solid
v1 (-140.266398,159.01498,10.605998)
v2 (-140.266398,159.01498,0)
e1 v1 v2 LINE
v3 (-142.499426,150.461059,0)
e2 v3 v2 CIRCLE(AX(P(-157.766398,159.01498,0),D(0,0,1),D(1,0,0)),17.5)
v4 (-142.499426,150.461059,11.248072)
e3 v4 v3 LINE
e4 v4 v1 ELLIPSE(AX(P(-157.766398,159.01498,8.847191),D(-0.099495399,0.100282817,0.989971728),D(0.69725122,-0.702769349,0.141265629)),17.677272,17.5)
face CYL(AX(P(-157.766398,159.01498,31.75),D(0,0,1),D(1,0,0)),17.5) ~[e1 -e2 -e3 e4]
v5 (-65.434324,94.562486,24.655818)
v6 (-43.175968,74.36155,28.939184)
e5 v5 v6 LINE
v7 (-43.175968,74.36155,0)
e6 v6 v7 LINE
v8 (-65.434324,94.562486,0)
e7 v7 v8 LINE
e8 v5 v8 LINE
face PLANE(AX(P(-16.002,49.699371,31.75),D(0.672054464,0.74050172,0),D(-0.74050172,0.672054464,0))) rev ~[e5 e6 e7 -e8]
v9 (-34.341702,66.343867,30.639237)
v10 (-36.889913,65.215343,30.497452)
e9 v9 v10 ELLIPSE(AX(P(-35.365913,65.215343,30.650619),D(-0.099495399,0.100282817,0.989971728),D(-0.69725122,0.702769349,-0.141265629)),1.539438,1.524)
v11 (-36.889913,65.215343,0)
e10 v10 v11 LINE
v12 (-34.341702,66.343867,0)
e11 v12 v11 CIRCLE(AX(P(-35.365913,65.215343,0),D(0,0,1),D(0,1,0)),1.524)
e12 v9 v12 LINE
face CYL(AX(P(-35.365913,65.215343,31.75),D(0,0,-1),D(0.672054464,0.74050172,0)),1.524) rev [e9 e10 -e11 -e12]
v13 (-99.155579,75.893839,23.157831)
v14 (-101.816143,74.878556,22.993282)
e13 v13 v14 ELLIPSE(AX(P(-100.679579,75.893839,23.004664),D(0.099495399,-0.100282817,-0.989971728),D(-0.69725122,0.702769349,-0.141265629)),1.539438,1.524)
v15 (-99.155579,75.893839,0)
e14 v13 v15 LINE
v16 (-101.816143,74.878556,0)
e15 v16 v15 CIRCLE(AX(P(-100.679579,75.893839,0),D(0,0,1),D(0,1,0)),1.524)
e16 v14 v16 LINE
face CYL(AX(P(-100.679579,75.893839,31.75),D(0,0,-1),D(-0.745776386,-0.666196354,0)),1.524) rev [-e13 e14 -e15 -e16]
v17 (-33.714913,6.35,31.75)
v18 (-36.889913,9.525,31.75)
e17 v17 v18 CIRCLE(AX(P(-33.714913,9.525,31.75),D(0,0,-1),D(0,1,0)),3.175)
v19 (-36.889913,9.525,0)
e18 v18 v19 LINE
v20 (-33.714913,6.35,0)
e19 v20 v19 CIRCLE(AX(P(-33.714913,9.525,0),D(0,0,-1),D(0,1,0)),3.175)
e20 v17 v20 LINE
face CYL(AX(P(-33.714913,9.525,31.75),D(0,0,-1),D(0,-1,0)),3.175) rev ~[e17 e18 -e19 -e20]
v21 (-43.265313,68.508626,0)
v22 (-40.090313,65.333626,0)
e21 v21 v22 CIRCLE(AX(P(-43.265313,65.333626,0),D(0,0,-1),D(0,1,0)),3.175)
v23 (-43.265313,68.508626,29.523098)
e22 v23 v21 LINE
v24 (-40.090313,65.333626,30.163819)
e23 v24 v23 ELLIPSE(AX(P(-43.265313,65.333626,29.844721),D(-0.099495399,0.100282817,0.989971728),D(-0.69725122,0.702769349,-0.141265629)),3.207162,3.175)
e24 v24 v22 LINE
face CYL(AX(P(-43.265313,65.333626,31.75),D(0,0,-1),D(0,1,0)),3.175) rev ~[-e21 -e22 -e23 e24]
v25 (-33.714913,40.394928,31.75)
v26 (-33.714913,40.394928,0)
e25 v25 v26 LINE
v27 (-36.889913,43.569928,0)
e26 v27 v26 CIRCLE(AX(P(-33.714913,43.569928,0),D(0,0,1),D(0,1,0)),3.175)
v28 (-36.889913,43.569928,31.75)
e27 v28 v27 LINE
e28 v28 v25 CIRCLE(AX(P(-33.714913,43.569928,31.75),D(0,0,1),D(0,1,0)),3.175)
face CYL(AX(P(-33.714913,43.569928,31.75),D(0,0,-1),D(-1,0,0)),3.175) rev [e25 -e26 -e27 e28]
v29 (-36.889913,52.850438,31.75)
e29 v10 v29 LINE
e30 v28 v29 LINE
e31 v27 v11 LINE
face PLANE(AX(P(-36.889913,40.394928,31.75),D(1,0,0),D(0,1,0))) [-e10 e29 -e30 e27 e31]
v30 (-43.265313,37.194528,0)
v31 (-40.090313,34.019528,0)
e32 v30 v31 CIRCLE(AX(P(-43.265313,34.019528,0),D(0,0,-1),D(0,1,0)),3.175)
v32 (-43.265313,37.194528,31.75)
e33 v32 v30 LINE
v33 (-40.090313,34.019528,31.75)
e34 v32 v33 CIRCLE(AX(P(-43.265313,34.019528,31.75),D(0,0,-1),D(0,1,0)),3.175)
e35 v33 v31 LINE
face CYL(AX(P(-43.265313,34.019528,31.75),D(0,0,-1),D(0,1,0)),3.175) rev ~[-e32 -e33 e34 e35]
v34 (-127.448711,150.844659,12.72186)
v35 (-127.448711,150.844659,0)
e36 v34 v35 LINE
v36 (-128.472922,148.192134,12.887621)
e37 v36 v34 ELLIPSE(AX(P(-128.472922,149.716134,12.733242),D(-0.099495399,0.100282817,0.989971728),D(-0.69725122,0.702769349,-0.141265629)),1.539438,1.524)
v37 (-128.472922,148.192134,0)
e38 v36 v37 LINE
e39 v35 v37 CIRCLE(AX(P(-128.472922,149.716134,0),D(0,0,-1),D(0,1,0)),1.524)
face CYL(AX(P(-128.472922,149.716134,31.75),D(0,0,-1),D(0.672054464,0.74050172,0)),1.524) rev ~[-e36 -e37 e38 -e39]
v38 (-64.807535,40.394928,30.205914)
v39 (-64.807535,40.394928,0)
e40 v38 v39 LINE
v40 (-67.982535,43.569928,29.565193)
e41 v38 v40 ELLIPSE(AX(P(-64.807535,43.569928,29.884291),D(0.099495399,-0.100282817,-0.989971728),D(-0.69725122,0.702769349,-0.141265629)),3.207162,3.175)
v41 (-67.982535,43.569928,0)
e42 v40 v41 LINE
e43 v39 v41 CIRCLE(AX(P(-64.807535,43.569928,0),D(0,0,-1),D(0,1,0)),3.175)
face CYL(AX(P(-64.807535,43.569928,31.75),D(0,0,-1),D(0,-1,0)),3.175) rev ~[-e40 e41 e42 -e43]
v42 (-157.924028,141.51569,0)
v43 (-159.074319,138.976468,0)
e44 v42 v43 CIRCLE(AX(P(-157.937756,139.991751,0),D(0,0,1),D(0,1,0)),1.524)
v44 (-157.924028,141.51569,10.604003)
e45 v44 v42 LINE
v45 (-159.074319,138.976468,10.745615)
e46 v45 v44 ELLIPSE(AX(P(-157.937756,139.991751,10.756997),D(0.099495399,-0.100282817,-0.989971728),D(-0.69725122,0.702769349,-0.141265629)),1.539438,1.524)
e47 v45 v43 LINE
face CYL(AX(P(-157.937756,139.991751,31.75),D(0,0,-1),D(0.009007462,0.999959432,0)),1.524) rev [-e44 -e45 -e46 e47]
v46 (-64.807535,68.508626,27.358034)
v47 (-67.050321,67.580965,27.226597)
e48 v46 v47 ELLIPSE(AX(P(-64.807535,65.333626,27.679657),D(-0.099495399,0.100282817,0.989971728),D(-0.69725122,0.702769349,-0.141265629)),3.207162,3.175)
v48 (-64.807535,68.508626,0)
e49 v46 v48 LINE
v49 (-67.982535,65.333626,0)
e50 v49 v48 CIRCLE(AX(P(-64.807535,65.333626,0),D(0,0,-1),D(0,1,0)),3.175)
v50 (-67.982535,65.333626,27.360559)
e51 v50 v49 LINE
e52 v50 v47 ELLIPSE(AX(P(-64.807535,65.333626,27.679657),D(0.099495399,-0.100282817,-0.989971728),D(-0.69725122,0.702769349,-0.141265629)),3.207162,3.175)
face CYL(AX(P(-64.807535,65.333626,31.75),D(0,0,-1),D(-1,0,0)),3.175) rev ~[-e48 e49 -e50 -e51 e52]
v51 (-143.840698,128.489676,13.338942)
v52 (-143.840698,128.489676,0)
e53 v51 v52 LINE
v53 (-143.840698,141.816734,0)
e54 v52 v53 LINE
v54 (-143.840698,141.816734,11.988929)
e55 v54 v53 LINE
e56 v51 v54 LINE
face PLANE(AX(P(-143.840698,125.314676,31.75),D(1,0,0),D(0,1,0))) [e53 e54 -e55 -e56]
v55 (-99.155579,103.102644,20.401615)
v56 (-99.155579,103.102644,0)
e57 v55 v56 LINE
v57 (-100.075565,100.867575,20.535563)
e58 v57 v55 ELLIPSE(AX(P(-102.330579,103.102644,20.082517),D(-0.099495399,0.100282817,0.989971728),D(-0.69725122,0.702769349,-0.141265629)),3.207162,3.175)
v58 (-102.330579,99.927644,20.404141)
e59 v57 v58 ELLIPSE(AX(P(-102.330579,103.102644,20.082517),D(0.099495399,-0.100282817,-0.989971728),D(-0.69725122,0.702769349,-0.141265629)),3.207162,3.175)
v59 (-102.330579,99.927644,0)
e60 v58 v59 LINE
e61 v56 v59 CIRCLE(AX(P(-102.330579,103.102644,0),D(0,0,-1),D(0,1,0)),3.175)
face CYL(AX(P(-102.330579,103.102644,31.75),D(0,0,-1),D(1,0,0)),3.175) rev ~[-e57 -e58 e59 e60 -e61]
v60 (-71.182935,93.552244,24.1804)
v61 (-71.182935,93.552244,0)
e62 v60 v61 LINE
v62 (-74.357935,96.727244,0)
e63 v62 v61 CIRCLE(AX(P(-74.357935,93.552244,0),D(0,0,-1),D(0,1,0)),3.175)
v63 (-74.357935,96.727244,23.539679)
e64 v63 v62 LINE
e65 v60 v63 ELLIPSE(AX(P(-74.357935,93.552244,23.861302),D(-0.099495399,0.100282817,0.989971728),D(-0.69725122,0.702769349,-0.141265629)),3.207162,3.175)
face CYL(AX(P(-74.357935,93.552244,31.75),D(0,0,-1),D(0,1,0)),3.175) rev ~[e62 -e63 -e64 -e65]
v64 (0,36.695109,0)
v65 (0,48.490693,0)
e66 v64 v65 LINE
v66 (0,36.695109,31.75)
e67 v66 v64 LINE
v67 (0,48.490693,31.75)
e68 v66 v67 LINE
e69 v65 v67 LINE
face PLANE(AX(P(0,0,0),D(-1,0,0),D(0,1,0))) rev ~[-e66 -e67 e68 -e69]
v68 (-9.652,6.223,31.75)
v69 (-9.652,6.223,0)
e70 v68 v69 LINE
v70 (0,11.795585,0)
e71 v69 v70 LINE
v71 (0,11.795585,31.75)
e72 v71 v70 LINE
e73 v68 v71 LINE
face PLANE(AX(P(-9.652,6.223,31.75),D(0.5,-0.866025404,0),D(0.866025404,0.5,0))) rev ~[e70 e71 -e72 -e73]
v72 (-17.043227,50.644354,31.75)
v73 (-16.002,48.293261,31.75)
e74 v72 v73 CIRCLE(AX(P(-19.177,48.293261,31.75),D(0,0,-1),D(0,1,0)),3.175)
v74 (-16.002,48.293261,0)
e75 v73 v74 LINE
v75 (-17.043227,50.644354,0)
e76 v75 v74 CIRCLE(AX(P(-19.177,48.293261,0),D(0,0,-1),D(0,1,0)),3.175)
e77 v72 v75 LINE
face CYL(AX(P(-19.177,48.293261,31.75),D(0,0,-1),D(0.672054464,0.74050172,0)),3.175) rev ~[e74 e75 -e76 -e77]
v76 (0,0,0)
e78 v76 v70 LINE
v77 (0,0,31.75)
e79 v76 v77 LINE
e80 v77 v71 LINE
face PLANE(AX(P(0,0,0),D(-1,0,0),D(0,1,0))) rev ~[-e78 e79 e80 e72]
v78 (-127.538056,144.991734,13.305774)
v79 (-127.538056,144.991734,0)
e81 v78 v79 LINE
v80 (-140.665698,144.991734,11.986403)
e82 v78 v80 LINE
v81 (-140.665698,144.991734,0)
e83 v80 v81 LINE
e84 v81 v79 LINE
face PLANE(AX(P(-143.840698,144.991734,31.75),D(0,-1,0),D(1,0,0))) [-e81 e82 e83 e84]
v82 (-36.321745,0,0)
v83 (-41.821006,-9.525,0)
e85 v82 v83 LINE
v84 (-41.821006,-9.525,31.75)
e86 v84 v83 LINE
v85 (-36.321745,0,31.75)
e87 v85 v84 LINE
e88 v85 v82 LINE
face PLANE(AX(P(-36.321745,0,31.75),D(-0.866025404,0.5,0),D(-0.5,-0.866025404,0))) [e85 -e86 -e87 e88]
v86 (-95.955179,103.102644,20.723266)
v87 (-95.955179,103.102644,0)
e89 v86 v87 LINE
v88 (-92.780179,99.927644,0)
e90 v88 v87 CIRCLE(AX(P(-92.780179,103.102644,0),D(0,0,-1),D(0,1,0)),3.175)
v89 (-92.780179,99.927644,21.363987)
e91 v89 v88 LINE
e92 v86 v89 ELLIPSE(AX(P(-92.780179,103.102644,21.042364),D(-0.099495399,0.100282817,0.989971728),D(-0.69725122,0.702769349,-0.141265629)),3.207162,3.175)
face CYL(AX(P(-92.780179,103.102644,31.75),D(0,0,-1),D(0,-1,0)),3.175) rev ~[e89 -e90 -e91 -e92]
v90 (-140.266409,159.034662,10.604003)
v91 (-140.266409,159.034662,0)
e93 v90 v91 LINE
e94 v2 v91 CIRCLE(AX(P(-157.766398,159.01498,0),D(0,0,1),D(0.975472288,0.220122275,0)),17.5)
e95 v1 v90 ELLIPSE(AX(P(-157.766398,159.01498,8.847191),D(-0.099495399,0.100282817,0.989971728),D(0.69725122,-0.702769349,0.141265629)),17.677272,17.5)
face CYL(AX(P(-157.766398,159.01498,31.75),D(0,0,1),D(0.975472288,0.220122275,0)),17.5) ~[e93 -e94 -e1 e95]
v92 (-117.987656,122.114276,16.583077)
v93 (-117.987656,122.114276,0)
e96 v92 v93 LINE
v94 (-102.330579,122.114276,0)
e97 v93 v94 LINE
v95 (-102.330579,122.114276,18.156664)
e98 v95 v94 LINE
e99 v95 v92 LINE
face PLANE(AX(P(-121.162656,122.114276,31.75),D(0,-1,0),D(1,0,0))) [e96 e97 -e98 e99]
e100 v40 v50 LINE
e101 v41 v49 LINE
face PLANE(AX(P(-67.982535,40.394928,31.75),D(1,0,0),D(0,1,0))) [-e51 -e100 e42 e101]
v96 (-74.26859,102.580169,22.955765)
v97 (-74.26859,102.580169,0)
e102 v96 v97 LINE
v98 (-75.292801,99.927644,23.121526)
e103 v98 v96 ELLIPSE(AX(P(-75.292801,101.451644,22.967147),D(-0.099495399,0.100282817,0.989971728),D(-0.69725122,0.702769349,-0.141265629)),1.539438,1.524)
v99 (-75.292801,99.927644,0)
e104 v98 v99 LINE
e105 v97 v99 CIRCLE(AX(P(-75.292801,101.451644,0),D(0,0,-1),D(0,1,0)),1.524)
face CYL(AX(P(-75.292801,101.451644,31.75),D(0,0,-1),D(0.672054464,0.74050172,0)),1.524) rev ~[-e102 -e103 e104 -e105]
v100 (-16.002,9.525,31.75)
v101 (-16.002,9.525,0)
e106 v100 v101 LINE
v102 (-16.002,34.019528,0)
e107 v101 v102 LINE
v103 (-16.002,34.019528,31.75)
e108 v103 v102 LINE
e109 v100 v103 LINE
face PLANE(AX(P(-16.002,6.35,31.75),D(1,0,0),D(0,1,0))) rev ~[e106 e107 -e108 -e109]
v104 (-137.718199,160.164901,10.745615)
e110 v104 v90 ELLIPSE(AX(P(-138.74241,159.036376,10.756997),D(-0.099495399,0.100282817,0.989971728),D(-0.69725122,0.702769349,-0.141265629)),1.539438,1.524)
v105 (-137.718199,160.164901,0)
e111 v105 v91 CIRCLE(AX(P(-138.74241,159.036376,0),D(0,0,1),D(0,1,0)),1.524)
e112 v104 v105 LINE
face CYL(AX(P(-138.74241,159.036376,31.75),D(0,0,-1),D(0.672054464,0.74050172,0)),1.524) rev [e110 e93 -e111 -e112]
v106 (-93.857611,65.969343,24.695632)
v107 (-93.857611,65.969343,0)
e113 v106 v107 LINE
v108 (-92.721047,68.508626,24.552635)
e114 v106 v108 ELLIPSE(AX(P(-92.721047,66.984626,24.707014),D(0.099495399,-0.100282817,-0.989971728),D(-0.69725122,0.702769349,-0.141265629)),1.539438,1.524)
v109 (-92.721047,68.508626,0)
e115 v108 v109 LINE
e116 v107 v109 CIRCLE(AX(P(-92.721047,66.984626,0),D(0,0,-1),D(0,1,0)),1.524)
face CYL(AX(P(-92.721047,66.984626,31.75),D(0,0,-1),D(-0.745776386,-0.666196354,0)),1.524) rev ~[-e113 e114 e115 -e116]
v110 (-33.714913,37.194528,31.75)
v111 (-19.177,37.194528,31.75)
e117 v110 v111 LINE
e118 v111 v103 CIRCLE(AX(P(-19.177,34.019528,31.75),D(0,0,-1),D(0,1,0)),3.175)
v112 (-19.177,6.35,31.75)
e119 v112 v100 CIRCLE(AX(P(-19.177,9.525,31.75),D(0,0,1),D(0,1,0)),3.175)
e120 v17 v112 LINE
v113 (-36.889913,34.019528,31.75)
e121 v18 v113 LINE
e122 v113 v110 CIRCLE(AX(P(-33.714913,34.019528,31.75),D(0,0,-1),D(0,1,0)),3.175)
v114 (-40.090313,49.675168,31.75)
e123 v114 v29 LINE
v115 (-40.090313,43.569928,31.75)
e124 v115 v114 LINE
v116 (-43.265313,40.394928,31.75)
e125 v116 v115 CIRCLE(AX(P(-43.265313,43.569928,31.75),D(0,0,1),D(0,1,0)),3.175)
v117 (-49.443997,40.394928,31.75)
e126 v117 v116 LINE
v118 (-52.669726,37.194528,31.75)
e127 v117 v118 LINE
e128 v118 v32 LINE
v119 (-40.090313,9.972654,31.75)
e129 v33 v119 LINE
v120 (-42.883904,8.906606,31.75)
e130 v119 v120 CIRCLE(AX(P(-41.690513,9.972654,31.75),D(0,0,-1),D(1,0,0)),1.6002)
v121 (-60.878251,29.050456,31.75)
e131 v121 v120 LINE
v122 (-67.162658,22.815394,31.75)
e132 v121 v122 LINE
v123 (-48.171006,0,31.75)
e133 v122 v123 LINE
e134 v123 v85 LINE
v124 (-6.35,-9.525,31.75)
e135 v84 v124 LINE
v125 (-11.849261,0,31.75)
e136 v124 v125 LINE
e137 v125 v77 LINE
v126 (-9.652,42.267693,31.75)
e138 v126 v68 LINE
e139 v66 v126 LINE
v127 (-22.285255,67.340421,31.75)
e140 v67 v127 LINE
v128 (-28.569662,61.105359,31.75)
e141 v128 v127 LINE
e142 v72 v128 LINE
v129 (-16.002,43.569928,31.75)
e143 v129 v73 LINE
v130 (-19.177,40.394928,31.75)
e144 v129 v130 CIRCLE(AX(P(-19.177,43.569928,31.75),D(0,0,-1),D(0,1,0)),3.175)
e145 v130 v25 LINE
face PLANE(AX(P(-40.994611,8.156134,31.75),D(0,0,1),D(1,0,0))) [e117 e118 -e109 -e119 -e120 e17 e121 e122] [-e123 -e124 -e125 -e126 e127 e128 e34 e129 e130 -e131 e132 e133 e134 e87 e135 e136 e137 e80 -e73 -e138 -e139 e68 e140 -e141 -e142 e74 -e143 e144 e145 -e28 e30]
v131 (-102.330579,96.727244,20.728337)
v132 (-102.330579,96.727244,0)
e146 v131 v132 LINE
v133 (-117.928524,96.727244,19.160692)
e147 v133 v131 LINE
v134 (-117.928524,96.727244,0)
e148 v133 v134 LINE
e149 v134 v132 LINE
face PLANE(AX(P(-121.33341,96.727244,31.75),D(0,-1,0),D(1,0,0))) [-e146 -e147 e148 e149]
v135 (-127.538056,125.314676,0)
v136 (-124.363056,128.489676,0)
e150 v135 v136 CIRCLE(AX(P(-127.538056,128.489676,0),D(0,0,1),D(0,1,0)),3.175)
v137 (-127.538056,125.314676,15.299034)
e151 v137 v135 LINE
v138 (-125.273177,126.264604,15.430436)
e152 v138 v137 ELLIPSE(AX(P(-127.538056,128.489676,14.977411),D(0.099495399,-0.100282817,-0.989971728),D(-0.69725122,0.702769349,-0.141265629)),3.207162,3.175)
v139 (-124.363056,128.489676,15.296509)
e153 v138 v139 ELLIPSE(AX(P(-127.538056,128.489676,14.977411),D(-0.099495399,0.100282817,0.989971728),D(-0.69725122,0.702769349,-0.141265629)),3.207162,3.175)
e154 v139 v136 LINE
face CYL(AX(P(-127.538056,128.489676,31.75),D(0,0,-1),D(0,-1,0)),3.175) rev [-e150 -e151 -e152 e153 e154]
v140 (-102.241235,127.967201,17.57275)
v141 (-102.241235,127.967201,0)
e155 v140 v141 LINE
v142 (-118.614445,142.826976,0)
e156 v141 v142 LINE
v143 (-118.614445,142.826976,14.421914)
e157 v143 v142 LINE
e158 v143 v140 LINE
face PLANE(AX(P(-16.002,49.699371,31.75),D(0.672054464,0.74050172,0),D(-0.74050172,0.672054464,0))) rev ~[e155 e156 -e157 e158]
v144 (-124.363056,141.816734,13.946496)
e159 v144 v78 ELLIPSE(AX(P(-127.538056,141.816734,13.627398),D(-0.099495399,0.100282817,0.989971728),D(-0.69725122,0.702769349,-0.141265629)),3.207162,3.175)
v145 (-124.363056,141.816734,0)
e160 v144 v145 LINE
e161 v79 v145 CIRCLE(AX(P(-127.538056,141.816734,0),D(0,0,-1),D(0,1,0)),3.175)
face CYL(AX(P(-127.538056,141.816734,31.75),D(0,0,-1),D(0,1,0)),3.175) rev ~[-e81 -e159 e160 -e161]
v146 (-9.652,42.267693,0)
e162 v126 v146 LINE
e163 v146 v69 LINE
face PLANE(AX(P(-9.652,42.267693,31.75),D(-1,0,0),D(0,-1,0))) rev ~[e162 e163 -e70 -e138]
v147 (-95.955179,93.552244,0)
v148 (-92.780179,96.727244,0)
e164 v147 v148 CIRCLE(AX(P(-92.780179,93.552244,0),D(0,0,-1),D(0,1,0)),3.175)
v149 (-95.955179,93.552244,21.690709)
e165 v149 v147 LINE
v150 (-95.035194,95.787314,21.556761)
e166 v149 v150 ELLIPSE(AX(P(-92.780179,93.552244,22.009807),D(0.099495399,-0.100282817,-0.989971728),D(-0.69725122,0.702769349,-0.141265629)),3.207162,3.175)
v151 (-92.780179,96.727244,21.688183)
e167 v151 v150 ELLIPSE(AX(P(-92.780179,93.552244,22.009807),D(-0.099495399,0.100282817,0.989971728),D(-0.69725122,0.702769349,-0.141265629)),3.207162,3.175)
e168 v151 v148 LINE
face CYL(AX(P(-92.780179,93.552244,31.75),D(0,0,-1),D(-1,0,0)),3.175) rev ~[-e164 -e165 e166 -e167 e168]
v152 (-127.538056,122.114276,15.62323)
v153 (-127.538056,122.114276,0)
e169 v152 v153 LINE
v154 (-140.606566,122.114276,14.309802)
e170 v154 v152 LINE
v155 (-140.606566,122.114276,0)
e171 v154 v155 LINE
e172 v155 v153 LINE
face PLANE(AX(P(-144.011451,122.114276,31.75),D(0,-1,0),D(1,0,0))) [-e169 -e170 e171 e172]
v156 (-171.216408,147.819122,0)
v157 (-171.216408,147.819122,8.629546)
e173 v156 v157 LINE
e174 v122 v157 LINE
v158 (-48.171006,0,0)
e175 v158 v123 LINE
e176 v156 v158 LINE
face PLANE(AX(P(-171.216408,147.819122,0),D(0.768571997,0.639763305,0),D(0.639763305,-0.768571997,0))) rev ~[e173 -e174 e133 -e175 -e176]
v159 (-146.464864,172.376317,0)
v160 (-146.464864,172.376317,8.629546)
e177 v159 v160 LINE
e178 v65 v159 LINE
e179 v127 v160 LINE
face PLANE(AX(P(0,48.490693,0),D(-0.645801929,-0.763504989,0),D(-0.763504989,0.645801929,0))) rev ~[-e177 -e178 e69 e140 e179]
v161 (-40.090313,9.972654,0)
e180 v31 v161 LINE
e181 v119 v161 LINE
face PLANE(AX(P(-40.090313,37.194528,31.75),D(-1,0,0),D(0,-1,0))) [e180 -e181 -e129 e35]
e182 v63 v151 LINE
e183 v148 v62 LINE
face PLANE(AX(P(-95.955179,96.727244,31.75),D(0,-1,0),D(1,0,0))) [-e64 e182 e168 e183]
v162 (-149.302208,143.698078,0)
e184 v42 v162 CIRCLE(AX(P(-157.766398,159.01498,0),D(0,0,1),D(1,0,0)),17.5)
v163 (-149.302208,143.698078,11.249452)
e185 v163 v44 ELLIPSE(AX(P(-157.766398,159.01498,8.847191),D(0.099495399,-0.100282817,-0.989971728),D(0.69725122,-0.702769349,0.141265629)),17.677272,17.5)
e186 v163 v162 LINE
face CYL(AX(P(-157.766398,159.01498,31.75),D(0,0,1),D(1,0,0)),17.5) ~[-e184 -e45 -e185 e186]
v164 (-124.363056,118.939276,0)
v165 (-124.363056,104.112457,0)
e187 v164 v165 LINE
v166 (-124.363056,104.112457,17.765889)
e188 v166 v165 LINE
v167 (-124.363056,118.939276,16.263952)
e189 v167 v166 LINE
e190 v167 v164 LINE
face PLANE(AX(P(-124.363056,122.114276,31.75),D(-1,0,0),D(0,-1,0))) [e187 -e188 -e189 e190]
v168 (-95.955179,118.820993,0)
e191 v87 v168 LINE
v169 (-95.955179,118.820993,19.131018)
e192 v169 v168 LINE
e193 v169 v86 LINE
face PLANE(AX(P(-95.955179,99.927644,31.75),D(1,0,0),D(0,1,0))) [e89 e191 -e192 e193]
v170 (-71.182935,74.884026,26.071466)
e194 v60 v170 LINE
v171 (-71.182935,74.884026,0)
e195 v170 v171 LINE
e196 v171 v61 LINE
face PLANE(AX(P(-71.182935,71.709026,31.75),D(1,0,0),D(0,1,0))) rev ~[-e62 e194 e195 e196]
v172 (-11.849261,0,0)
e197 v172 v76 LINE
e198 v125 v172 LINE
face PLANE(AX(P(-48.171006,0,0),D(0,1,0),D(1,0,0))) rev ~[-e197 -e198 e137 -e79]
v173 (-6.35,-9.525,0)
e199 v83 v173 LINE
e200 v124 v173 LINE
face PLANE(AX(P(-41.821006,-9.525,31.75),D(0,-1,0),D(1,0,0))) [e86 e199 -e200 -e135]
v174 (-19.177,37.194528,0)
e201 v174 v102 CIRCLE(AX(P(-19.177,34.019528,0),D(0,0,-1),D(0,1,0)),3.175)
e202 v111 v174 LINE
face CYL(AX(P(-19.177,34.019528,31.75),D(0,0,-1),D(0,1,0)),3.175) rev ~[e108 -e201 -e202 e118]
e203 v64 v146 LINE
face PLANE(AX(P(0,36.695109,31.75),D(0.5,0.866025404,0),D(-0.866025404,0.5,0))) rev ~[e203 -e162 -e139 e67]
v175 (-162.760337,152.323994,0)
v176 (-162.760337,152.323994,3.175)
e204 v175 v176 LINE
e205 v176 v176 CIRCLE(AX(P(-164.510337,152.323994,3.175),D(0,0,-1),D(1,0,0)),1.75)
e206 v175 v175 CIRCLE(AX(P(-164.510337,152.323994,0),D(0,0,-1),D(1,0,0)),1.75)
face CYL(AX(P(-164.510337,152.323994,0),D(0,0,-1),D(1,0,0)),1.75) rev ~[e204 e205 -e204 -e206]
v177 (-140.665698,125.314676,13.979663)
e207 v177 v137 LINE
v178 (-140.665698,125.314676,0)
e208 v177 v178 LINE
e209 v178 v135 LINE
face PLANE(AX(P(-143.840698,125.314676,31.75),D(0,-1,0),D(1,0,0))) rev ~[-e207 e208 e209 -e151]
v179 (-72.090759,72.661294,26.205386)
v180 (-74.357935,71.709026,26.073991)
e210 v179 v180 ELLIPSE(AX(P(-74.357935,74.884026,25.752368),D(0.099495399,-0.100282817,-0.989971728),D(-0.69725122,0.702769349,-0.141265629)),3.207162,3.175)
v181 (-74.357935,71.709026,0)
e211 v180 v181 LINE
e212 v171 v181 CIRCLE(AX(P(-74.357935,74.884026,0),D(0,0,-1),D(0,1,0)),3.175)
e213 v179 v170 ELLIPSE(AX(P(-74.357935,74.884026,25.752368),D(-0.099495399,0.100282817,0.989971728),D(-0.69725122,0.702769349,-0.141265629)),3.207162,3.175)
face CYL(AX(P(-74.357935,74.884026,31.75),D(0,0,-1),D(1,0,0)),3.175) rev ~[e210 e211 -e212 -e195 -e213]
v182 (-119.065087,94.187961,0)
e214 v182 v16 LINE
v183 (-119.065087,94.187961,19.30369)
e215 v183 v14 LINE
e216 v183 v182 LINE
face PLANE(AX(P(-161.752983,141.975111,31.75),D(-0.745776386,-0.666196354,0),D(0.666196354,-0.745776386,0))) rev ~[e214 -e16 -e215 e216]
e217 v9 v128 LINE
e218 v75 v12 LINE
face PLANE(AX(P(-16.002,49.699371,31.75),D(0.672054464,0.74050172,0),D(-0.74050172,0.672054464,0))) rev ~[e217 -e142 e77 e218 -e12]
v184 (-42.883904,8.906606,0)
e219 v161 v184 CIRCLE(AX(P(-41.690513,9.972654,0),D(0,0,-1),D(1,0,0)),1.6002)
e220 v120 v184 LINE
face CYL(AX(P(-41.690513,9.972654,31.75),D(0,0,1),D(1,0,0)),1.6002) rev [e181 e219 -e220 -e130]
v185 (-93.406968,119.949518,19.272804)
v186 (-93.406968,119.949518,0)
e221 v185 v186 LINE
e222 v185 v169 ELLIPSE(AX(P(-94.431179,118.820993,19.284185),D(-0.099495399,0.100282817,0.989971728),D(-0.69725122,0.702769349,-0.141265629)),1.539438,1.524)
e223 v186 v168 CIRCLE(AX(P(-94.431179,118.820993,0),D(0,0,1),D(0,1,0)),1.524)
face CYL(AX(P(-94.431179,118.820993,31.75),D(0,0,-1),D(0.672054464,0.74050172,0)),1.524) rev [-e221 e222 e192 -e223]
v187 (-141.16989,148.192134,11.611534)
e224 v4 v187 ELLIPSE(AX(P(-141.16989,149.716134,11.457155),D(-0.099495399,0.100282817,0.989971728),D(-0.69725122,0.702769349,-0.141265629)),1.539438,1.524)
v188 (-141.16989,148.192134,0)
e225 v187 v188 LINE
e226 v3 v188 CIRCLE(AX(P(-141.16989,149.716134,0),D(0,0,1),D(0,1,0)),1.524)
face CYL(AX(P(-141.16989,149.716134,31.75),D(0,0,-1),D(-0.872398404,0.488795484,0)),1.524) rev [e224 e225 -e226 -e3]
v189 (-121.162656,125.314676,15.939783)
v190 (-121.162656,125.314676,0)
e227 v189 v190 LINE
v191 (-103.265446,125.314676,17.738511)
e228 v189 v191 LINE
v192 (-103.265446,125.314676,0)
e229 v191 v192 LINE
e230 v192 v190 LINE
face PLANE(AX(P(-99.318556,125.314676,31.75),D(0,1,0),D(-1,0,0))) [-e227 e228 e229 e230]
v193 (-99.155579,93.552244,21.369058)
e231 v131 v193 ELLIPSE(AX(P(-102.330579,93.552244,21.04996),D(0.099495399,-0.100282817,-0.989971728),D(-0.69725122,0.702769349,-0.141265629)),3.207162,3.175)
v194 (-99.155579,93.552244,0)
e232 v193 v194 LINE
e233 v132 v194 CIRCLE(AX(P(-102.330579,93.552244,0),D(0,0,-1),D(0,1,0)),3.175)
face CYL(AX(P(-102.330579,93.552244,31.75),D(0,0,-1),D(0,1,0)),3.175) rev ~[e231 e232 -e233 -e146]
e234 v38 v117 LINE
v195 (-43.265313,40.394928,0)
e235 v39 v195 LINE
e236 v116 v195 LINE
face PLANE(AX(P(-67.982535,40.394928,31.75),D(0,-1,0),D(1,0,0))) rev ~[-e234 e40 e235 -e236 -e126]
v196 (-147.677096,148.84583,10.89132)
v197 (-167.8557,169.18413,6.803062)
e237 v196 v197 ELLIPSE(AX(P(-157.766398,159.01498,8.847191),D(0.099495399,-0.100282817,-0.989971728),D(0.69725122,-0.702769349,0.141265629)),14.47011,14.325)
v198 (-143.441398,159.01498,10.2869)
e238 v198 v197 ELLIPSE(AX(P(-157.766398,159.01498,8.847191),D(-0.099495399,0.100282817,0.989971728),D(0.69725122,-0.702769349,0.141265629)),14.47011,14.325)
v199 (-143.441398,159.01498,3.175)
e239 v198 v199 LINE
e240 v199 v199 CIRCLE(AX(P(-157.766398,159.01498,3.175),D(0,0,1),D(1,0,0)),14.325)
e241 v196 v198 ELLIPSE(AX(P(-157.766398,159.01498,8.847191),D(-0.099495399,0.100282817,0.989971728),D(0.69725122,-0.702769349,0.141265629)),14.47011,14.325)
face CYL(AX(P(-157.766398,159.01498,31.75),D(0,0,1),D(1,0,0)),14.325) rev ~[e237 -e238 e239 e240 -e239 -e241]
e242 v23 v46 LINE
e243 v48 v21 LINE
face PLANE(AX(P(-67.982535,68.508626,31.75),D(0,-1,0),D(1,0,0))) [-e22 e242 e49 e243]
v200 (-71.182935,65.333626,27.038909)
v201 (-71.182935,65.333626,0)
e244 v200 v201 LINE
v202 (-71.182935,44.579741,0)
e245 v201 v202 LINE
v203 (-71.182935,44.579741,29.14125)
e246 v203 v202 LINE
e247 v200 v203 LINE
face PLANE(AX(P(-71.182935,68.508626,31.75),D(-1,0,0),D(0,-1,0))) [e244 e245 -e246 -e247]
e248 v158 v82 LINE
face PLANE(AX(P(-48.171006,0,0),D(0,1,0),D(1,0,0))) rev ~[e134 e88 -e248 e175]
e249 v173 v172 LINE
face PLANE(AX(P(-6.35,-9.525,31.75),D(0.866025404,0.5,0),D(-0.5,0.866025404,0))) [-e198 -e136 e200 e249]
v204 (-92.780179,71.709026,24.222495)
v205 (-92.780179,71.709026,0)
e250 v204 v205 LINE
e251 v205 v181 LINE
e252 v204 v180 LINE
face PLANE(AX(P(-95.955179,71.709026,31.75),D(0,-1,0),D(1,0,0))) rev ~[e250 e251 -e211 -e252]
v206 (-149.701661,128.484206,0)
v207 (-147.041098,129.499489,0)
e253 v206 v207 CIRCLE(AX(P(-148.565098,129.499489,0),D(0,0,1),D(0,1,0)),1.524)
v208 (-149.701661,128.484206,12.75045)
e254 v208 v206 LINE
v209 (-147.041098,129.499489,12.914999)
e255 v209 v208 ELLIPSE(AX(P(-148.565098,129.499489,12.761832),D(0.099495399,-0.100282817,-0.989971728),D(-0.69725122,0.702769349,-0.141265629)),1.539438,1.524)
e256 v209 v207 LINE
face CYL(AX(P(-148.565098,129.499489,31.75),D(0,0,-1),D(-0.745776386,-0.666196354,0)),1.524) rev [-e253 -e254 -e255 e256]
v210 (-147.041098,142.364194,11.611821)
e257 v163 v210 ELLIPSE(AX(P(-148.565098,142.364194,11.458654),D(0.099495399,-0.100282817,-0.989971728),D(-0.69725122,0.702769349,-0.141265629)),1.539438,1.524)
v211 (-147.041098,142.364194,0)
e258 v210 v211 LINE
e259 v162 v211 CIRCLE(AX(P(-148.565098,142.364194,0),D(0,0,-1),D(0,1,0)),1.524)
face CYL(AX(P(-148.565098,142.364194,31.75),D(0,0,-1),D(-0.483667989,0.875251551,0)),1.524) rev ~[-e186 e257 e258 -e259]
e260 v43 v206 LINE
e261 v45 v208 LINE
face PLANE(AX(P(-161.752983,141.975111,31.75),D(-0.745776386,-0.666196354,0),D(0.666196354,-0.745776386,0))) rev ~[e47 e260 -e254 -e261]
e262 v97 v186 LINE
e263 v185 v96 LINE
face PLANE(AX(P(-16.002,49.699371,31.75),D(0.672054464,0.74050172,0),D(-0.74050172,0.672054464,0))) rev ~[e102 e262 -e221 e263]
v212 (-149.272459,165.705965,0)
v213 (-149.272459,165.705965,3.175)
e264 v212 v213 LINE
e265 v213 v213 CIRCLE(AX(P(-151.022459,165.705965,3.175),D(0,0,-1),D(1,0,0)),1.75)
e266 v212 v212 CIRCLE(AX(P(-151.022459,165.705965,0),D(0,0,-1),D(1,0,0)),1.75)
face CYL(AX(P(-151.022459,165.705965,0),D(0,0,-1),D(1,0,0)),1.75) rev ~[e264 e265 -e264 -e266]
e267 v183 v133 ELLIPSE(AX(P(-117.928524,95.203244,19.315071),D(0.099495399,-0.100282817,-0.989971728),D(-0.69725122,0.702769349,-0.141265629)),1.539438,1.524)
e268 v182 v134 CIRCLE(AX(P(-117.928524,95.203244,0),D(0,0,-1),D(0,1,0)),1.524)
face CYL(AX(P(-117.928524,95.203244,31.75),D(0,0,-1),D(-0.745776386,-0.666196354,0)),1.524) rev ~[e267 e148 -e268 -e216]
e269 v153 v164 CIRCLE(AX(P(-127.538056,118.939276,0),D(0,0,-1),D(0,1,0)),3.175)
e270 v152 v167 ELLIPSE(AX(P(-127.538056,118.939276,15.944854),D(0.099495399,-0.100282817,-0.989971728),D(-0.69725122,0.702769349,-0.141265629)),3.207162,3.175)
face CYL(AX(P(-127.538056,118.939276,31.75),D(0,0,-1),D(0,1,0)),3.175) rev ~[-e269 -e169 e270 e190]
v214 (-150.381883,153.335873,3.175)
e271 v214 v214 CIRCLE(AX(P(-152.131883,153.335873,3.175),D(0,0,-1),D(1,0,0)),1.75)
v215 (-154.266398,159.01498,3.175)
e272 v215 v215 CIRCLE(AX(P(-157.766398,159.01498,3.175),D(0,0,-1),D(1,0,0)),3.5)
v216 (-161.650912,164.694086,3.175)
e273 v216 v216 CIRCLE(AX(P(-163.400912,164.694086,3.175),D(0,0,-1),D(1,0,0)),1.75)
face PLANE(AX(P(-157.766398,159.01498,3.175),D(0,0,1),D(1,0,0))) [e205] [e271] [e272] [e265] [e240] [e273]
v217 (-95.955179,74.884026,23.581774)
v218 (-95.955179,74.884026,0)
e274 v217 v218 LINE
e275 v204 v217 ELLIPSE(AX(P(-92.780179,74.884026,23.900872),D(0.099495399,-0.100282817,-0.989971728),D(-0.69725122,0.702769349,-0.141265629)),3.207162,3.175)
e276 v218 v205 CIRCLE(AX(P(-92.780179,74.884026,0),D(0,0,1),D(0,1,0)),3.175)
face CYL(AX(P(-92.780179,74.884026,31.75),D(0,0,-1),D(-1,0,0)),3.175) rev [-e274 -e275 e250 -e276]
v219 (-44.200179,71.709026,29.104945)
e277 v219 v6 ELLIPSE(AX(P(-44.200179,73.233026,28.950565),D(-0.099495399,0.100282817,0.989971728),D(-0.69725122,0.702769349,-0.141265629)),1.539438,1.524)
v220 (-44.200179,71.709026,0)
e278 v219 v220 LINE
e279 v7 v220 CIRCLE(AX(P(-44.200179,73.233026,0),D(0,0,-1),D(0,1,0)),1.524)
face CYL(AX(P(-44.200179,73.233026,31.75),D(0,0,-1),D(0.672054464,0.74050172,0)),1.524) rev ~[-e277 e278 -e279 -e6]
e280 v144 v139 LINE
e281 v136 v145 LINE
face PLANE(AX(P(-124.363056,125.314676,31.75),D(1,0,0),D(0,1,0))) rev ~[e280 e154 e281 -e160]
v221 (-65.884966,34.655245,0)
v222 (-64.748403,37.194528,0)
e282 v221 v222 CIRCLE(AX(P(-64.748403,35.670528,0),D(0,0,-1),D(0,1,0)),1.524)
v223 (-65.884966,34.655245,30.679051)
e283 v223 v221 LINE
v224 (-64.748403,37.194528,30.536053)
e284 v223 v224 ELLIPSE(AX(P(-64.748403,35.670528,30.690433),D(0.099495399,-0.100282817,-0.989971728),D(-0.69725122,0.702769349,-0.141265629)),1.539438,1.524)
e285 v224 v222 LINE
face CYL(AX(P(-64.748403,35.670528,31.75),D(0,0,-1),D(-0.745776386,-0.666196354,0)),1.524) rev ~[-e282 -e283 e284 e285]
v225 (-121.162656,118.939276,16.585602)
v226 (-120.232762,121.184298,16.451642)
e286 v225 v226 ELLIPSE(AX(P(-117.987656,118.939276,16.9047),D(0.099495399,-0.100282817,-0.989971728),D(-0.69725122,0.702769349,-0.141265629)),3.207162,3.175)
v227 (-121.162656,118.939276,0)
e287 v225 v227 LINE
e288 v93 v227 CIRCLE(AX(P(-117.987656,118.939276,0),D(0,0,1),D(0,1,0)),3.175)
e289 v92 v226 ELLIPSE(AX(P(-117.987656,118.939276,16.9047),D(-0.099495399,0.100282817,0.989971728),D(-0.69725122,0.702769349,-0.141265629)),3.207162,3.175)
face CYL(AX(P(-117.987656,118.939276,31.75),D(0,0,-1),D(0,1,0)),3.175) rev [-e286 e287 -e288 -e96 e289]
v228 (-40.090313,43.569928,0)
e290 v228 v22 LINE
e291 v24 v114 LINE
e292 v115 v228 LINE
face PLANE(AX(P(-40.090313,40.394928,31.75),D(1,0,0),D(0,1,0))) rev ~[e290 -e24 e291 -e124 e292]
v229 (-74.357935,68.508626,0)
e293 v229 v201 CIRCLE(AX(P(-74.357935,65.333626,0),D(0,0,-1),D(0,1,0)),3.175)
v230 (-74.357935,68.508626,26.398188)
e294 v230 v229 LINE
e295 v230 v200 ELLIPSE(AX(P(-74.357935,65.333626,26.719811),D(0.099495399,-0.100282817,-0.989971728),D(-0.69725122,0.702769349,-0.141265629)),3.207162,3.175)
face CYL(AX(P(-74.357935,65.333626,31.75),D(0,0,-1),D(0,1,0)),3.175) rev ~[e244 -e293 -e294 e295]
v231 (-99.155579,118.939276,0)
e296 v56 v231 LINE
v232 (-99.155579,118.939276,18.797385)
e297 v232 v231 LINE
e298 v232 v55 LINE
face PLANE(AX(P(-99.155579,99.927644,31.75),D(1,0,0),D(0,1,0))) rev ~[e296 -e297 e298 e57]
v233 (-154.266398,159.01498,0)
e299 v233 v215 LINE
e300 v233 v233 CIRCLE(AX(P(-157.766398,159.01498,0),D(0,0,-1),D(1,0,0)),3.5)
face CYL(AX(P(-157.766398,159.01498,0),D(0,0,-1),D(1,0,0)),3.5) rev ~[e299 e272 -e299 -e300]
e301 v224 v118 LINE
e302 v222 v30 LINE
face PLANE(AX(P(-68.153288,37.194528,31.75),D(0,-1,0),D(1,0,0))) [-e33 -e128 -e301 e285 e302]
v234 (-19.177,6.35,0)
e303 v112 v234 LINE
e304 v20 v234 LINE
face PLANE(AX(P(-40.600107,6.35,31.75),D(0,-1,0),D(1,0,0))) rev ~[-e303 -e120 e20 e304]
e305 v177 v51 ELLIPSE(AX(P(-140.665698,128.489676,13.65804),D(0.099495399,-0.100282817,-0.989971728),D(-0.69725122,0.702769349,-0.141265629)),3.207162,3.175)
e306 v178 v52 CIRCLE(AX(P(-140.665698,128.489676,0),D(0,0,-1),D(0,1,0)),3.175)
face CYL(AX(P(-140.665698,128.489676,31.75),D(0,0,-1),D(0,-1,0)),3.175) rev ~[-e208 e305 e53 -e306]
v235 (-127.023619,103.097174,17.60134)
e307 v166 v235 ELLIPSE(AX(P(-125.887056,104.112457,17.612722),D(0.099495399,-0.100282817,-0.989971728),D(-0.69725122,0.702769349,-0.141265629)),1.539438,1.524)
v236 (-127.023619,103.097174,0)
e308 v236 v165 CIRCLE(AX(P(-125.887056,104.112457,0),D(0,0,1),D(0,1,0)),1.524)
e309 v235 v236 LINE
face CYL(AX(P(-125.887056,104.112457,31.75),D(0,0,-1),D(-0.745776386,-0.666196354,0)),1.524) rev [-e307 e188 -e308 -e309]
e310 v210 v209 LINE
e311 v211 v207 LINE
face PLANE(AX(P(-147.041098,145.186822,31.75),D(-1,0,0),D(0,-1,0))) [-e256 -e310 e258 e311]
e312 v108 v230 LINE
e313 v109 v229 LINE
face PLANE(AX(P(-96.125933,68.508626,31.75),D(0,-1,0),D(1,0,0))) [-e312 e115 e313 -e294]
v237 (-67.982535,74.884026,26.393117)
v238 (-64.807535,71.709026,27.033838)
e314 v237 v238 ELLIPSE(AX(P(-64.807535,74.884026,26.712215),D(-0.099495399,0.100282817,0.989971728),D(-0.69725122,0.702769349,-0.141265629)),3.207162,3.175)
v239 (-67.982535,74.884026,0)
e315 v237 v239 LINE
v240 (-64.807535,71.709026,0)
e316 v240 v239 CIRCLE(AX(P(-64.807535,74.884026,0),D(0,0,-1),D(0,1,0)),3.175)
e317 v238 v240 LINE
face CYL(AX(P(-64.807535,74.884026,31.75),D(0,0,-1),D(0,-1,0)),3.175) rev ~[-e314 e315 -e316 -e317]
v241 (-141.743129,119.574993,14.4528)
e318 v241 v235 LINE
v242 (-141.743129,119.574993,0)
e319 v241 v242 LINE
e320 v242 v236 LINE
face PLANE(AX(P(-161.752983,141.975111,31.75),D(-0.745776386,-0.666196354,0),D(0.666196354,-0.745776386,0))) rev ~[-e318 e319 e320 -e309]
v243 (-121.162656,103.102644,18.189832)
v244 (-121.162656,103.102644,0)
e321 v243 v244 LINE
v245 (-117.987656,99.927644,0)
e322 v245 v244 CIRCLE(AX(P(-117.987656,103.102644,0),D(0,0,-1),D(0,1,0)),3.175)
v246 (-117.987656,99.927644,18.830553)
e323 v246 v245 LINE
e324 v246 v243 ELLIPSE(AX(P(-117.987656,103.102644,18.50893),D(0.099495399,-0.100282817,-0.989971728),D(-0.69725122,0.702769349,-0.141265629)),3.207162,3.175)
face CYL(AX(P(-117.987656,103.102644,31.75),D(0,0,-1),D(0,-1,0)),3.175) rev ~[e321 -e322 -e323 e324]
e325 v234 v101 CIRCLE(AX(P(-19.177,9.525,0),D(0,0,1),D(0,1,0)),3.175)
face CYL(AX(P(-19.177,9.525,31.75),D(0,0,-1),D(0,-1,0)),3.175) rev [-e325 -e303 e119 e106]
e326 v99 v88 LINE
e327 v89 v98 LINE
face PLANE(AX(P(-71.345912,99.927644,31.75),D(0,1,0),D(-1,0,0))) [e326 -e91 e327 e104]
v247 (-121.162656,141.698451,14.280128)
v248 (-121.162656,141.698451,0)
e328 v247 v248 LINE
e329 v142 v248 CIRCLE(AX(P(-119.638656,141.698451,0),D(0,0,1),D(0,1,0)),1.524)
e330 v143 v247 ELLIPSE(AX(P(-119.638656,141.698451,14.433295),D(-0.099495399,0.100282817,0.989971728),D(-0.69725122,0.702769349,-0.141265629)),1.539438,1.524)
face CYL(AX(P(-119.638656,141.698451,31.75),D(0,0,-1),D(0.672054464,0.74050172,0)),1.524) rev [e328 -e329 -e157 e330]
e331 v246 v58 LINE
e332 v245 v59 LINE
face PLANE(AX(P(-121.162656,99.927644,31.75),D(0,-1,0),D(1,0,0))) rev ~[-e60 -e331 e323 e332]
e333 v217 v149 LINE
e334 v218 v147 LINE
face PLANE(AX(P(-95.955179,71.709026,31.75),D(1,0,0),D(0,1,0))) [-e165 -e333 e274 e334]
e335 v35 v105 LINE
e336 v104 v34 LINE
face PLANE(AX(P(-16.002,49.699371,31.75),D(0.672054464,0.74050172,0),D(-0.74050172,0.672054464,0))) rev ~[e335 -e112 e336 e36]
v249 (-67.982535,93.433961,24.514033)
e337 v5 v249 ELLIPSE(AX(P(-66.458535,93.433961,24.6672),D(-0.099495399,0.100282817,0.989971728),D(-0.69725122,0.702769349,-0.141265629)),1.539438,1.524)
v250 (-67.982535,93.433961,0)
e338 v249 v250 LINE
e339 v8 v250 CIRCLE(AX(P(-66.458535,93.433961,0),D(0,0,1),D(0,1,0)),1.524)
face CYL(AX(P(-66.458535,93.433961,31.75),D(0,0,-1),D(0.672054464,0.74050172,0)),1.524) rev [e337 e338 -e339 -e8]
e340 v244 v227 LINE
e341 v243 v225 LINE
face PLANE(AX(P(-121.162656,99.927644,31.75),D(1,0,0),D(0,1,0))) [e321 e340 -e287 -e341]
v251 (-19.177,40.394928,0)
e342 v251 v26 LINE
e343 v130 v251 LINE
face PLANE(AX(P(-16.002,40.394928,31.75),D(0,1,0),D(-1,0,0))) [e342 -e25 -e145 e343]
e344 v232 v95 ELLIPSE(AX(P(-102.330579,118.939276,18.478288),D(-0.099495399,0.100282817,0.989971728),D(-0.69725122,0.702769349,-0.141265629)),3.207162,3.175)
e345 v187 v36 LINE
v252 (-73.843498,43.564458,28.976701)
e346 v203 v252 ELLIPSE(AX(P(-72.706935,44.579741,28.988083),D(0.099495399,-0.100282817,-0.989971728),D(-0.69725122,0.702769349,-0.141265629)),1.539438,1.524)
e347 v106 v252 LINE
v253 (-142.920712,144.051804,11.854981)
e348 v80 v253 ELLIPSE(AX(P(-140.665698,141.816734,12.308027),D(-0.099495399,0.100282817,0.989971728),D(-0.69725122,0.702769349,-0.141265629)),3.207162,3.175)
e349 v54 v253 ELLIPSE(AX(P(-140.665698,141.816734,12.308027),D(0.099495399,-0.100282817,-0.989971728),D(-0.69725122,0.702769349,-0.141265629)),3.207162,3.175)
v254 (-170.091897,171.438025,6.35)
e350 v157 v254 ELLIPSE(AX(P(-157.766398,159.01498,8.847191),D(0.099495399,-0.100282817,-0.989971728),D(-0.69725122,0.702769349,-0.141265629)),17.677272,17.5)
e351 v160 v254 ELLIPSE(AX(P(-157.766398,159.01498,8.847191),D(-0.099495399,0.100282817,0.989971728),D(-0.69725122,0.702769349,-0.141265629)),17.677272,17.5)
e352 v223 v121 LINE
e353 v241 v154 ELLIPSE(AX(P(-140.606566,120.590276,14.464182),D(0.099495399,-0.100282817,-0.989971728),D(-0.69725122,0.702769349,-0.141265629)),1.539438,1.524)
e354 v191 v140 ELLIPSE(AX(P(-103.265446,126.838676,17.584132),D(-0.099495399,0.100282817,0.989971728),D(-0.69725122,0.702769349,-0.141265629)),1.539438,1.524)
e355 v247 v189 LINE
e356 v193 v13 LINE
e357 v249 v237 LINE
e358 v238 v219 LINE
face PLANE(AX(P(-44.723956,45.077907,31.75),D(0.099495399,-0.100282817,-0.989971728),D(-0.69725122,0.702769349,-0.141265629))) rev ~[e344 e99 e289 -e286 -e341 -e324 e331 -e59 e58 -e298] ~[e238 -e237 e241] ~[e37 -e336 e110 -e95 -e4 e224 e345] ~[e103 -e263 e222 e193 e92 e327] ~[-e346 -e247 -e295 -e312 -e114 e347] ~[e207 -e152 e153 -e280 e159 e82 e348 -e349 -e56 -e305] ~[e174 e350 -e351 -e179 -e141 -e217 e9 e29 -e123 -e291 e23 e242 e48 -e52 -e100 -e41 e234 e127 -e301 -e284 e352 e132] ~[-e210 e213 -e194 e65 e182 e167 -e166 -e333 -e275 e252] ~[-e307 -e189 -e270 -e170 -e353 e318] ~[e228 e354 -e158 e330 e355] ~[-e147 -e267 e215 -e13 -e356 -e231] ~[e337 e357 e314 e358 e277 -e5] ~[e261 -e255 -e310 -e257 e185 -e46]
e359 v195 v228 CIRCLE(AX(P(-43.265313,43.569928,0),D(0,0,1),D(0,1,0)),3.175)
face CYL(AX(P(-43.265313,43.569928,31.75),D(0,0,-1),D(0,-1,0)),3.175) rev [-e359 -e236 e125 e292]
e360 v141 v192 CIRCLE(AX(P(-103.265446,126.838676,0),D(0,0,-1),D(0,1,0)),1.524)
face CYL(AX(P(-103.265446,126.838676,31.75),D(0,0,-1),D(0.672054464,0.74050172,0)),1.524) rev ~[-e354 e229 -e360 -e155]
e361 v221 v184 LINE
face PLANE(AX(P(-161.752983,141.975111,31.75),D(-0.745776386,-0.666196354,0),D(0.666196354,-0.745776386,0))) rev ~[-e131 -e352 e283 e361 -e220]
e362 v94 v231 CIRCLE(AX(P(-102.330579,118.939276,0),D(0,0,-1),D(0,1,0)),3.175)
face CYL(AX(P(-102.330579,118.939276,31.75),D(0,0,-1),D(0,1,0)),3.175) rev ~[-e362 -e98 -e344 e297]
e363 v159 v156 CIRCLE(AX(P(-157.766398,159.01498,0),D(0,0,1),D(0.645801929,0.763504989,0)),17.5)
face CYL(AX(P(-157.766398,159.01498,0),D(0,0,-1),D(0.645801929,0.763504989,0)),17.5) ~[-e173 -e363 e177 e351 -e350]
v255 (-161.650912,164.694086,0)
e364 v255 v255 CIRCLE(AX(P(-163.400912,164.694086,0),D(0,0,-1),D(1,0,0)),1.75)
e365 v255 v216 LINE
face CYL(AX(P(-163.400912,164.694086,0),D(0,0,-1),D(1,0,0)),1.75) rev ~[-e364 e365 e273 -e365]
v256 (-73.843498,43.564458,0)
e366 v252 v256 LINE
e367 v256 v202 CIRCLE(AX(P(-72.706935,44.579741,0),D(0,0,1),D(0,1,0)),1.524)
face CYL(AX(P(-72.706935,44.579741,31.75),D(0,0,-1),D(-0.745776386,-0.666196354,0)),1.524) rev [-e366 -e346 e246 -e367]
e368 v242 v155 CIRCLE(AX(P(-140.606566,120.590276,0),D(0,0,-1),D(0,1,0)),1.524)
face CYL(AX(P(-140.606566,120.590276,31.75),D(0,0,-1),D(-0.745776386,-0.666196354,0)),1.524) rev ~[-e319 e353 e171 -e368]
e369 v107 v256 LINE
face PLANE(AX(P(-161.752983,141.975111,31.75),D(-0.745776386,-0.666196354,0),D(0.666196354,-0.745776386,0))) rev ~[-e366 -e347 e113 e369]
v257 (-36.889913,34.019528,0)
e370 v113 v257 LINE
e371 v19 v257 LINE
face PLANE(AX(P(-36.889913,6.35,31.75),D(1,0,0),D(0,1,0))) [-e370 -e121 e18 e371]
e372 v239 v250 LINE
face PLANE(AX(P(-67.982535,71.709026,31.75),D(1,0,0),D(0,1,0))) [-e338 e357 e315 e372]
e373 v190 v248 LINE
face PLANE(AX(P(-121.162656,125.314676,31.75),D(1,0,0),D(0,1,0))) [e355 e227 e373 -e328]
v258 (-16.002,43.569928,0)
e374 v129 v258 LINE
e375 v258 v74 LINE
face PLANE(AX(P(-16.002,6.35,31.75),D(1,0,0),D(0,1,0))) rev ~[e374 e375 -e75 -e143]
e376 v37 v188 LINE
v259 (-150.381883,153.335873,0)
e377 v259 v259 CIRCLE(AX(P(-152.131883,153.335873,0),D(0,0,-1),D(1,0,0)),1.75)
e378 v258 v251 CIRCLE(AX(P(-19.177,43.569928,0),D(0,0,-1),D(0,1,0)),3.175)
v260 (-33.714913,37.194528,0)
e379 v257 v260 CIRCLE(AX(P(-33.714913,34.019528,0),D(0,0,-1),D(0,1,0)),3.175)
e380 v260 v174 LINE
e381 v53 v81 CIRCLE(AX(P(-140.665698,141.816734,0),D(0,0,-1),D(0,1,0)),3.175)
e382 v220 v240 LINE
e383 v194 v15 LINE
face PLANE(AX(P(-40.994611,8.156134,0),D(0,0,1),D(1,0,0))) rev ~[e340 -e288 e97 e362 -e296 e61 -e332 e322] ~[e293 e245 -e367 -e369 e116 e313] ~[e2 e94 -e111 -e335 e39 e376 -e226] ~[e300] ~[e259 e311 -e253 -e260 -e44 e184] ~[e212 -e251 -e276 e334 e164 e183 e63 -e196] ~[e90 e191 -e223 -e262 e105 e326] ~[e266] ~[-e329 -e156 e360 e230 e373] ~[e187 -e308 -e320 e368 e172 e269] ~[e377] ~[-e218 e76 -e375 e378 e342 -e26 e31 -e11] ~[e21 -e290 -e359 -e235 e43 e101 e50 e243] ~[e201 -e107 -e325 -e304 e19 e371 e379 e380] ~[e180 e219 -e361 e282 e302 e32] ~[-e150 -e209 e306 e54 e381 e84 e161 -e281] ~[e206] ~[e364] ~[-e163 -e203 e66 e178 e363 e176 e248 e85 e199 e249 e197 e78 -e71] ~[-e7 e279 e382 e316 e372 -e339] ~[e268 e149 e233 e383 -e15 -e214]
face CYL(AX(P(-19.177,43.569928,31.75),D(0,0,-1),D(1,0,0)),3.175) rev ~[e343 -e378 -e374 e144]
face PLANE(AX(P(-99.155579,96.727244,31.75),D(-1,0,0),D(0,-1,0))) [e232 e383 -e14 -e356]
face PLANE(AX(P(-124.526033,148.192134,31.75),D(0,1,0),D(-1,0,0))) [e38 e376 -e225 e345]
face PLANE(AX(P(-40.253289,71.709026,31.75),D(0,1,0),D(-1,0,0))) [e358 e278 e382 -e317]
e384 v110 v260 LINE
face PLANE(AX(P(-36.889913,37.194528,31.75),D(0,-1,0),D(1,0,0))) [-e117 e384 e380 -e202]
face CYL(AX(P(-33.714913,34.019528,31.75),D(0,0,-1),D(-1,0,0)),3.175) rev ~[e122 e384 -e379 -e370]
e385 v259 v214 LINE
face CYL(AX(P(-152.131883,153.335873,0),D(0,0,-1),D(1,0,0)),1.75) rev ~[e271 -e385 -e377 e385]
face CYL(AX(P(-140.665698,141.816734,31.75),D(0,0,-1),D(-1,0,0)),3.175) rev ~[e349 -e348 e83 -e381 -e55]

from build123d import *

# Parameters (mm, degrees)
F1_DEPTH       = 31.75
F2_R           = 14.325
F3_DEPTH       = 28.575
F5_DEPTH       = 31.75
F7_DEPTH       = 31.751
F9_DEPTH       = 31.751
F10_W          = 27.8922222136
F10_H          = 28.1136979927
F10_W_2        = 22.0070765571
F10_H_2        = 22.18663187
F10_W_3        = 19.4776418147
F10_H_3        = 19.6770581923
F10_W_4        = 24.7722447466
F10_H_4        = 25.0182185186
F11_DEPTH      = 31.75
F12_R          = 1.524
F13_R          = 1.524
F14_R          = 3.175
F16_DEPTH      = 31.75
F20_DEPTH      = 131.1291589461
F20_DEPTH_BACK = 124.3230200021
F21_R          = 3.5
F21_R_2        = 1.75
F22_DEPTH      = 31.751


# Not quite as in the source:
# - a feature names something its author has since deleted; it is built from what else it names


with BuildPart() as f1:
    # F0 (on Top) → F1 (new body)
    with BuildSketch(Plane.XY):
        with BuildLine():
            ThreePointArc((-171.2164076011, 147.819121873), (-151.8134645157, 142.5585953186), (-140.2663976585, 159.0149797027))
            ThreePointArc((-140.2663976585, 159.0149797027), (-141.8914670948, 166.3795285416), (-146.4648638984, 172.3763170112))
            ThreePointArc((-146.4648638984, 172.3763170112), (-170.0918974756, 171.438024992), (-171.2164076011, 147.819121873))
        make_face()
        with BuildLine():
            ThreePointArc((-146.4648638984, 172.3763170112), (-141.8914670948, 166.3795285416), (-140.2663976585, 159.0149797027))
            ThreePointArc((-140.2663976585, 159.0149797027), (-151.8134645157, 142.5585953186), (-171.2164076011, 147.819121873))
            Line((-171.2164076011, 147.819121873), (-48.1710061431, 0))
            Line((-48.1710061431, 0), (0, 0))
            Line((0, 0), (0, 48.4906934548))
            Line((0, 48.4906934548), (-146.4648638984, 172.3763170112))
        make_face()
    extrude(amount=F1_DEPTH)

    # F2 (on face) → F3 (cut)
    with BuildSketch(Plane.XY.offset(31.75)):
        with Locations((-157.7663976585, 159.0149797027)):
            Circle(F2_R)
    extrude(amount=-F3_DEPTH, mode=Mode.SUBTRACT)

    # F4 (on face) → F5 (join)
    with BuildSketch(Plane.XY.offset(31.75)):
        Polygon((-11.849261314, 0), (-36.3217448291, 0), (-41.8210061431, -9.525), (-6.35, -9.525), align=None)
    extrude(amount=-F5_DEPTH)

    # F6 (on face) → F7 (cut, through all)
    with BuildSketch(Plane.XY.offset(31.75)):
        Polygon((-9.652, 6.223), (0, 11.7955847982), (0, 36.6951086566), (-9.652, 42.2676934548), align=None)
    extrude(amount=-F7_DEPTH, mode=Mode.SUBTRACT)

    # F8 (on face) → F9 (cut, through all)
    with BuildSketch(Plane.XY.offset(31.75)):
        with BuildLine():
            Line((-16.002, 49.699371019), (-140.6956326235, 162.8671195132))
            ThreePointArc((-140.6956326235, 162.8671195132), (-140.3740374375, 160.9529698843), (-140.2663976585, 159.0149797027))
            ThreePointArc((-140.2663976585, 159.0149797027), (-146.8924666341, 145.3033924833), (-161.7529832673, 141.9751107131))
            Line((-161.7529832673, 141.9751107131), (-40.600106963, 6.35))
            Line((-40.600106963, 6.35), (-16.002, 6.35))
            Line((-16.002, 6.35), (-16.002, 49.699371019))
        make_face()
    extrude(amount=-F9_DEPTH, mode=Mode.SUBTRACT)

    # F10 (on face) → F11 (join, through all)
    with BuildSketch(Plane.XY.offset(31.75)):
        with BuildLine():
            ThreePointArc((-144.01445162, 148.1921344135), (-145.4358718483, 146.5969229609), (-147.0410978414, 145.1868220585))
            Line((-147.0410978414, 145.1868220585), (-147.0410978414, 125.5058270234))
            Line((-147.0410978414, 125.5058270234), (-144.0114513942, 122.1142762212))
            Line((-144.0114513942, 122.1142762212), (-124.3630560267, 122.1142762212))
            Line((-124.3630560267, 122.1142762212), (-124.3630560267, 100.1187951534))
            Line((-124.3630560267, 100.1187951534), (-121.3334095795, 96.7272443512))
            Line((-121.3334095795, 96.7272443512), (-99.1555794696, 96.7272443512))
            Line((-99.1555794696, 96.7272443512), (-99.1555794696, 71.9001766348))
            Line((-99.1555794696, 71.9001766348), (-96.1259330223, 68.5086258326))
            Line((-96.1259330223, 68.5086258326), (-71.182934723, 68.5086258326))
            Line((-71.182934723, 68.5086258326), (-71.182934723, 40.5860786421))
            Line((-71.182934723, 40.5860786421), (-68.1532882758, 37.1945278399))
            Line((-68.1532882758, 37.1945278399), (-40.0903125094, 37.1945278399))
            Line((-40.0903125094, 37.1945278399), (-40.0903125094, 6.35))
            Line((-40.0903125094, 6.35), (-36.8899125094, 6.35))
            Line((-36.8899125094, 6.35), (-36.8899125094, 37.1945278399))
            Line((-36.8899125094, 37.1945278399), (-16.002, 37.1945278399))
            Line((-16.002, 37.1945278399), (-16.002, 40.3949278399))
            Line((-16.002, 40.3949278399), (-36.8899125094, 40.3949278399))
            Line((-36.8899125094, 40.3949278399), (-36.8899125094, 68.6565381148))
            Line((-36.8899125094, 68.6565381148), (-40.2532893295, 71.7090258326))
            Line((-40.2532893295, 71.7090258326), (-67.982534723, 71.7090258326))
            Line((-67.982534723, 71.7090258326), (-67.982534723, 96.8751566334))
            Line((-67.982534723, 96.8751566334), (-71.3459115431, 99.9276443512))
            Line((-71.3459115431, 99.9276443512), (-95.9551794696, 99.9276443512))
            Line((-95.9551794696, 99.9276443512), (-95.9551794696, 122.2621885034))
            Line((-95.9551794696, 122.2621885034), (-99.3185562896, 125.3146762212))
            Line((-99.3185562896, 125.3146762212), (-121.1626560267, 125.3146762212))
            Line((-121.1626560267, 125.3146762212), (-121.1626560267, 145.1396466957))
            Line((-121.1626560267, 145.1396466957), (-124.5260328468, 148.1921344135))
            Line((-124.5260328468, 148.1921344135), (-144.01445162, 148.1921344135))
        make_face()
        with Locations((-54.0364236162, 54.4517768362)):
            Rectangle(F10_W, F10_H, mode=Mode.SUBTRACT)
        with Locations((-110.1591177481, 111.0209602862)):
            Rectangle(F10_W_2, F10_H_2, mode=Mode.SUBTRACT)
        with Locations((-134.101876934, 135.1532053173)):
            Rectangle(F10_W_3, F10_H_3, mode=Mode.SUBTRACT)
        with Locations((-83.5690570963, 84.2181350919)):
            Rectangle(F10_W_4, F10_H_4, mode=Mode.SUBTRACT)
    extrude(amount=-F11_DEPTH)

    # F12
    f12_edges = [f1.edges().sort_by_distance(p)[0] for p in [
        (-147.041098, 145.186822, 15.875),
        (-161.752983, 141.975111, 15.875),
        (-147.041098, 125.505827, 15.875),
        (-140.695633, 162.86712, 15.875),
        (-144.014452, 148.192134, 15.875),
        (-124.526033, 148.192134, 15.875),
    ]]
    fillet(f12_edges, radius=F12_R)

    # F13
    f13_edges = [f1.edges().sort_by_distance(p)[0] for p in [
        (-124.363056, 100.118795, 15.875),
        (-144.011451, 122.114276, 15.875),
        (-121.33341, 96.727244, 15.875),
        (-99.155579, 71.900177, 15.875),
        (-71.182935, 40.586079, 15.875),
        (-96.125933, 68.508626, 15.875),
        (-95.955179, 122.262189, 15.875),
        (-121.162656, 145.139647, 15.875),
        (-67.982535, 96.875157, 15.875),
        (-99.318556, 125.314676, 15.875),
        (-71.345912, 99.927644, 15.875),
        (-40.253289, 71.709026, 15.875),
        (-68.153288, 37.194528, 15.875),
        (-36.889913, 68.656538, 15.875),
    ]]
    fillet(f13_edges, radius=F13_R)

    # F14
    f14_edges = [f1.edges().sort_by_distance(p)[0] for p in [
        (-40.090313, 40.394928, 15.875),
        (-67.982535, 40.394928, 15.875),
        (-67.982535, 68.508626, 15.875),
        (-40.090313, 68.508626, 15.875),
        (-40.090313, 37.194528, 15.875),
        (-16.002, 37.194528, 15.875),
        (-36.889913, 37.194528, 15.875),
        (-36.889913, 6.35, 15.875),
        (-16.002, 6.35, 15.875),
        (-71.182935, 68.508626, 15.875),
        (-71.182935, 71.709026, 15.875),
        (-67.982535, 71.709026, 15.875),
        (-95.955179, 71.709026, 15.875),
        (-95.955179, 96.727244, 15.875),
        (-71.182935, 96.727244, 15.875),
        (-99.155579, 96.727244, 15.875),
        (-99.155579, 122.114276, 15.875),
        (-124.363056, 122.114276, 15.875),
        (-124.363056, 144.991734, 15.875),
        (-95.955179, 99.927644, 15.875),
        (-121.162656, 99.927644, 15.875),
        (-143.840698, 125.314676, 15.875),
        (-99.155579, 99.927644, 15.875),
        (-124.363056, 125.314676, 15.875),
        (-121.162656, 122.114276, 15.875),
        (-143.840698, 144.991734, 15.875),
        (-36.889913, 40.394928, 15.875),
        (-16.002, 49.699371, 15.875),
        (-16.002, 40.394928, 15.875),
    ]]
    fillet(f14_edges, radius=F14_R)

    # F15 (on face) → F16 (join, through all)
    with BuildSketch(Plane.XY.offset(31.75)):
        with BuildLine():
            ThreePointArc((-40.0903125094, 9.9726537321), (-41.119997319, 8.4776111048), (-42.8839038824, 8.9066063266))
            Line((-42.8839038824, 8.9066063266), (-40.600106963, 6.35))
            Line((-40.600106963, 6.35), (-40.0903125094, 6.35))
            Line((-40.0903125094, 6.35), (-40.0903125094, 9.9726537321))
        make_face()
    extrude(amount=-F16_DEPTH)

    # F19 (on face) → F20 (cut, two sides)
    with BuildSketch(Plane(origin=(0, 0, 0), x_dir=(-0.7043142753, 0.7098883022, 0), z_dir=(0.7098883022, 0.7043142753, 0))) as f20_sk:
        Polygon((241.5, 6.35), (241.5, 31.75), (225.5252254981, 31.75), (63.5, 31.75), align=None)
    extrude(amount=-F20_DEPTH, mode=Mode.SUBTRACT)
    extrude(f20_sk.sketch, amount=F20_DEPTH_BACK, mode=Mode.SUBTRACT)

    # F21 (on face) → F22 (cut, through all)
    with BuildSketch(Plane(origin=(0, 0, 0), x_dir=(1, 0, 0), z_dir=(0, 0, -1))):
        with Locations((-157.7663976585, -159.0149797027)):
            Circle(F21_R)
        with Locations((-152.1318834564, -153.3358732848)):
            Circle(F21_R_2)
        with Locations((-163.4009118606, -164.6940861207)):
            Circle(F21_R_2)
        with Locations((-151.0224587872, -165.7059653177)):
            Circle(F21_R_2)
        with Locations((-164.5103365298, -152.3239940878)):
            Circle(F21_R_2)
    extrude(amount=-F22_DEPTH, mode=Mode.SUBTRACT)


solid = f1.part
